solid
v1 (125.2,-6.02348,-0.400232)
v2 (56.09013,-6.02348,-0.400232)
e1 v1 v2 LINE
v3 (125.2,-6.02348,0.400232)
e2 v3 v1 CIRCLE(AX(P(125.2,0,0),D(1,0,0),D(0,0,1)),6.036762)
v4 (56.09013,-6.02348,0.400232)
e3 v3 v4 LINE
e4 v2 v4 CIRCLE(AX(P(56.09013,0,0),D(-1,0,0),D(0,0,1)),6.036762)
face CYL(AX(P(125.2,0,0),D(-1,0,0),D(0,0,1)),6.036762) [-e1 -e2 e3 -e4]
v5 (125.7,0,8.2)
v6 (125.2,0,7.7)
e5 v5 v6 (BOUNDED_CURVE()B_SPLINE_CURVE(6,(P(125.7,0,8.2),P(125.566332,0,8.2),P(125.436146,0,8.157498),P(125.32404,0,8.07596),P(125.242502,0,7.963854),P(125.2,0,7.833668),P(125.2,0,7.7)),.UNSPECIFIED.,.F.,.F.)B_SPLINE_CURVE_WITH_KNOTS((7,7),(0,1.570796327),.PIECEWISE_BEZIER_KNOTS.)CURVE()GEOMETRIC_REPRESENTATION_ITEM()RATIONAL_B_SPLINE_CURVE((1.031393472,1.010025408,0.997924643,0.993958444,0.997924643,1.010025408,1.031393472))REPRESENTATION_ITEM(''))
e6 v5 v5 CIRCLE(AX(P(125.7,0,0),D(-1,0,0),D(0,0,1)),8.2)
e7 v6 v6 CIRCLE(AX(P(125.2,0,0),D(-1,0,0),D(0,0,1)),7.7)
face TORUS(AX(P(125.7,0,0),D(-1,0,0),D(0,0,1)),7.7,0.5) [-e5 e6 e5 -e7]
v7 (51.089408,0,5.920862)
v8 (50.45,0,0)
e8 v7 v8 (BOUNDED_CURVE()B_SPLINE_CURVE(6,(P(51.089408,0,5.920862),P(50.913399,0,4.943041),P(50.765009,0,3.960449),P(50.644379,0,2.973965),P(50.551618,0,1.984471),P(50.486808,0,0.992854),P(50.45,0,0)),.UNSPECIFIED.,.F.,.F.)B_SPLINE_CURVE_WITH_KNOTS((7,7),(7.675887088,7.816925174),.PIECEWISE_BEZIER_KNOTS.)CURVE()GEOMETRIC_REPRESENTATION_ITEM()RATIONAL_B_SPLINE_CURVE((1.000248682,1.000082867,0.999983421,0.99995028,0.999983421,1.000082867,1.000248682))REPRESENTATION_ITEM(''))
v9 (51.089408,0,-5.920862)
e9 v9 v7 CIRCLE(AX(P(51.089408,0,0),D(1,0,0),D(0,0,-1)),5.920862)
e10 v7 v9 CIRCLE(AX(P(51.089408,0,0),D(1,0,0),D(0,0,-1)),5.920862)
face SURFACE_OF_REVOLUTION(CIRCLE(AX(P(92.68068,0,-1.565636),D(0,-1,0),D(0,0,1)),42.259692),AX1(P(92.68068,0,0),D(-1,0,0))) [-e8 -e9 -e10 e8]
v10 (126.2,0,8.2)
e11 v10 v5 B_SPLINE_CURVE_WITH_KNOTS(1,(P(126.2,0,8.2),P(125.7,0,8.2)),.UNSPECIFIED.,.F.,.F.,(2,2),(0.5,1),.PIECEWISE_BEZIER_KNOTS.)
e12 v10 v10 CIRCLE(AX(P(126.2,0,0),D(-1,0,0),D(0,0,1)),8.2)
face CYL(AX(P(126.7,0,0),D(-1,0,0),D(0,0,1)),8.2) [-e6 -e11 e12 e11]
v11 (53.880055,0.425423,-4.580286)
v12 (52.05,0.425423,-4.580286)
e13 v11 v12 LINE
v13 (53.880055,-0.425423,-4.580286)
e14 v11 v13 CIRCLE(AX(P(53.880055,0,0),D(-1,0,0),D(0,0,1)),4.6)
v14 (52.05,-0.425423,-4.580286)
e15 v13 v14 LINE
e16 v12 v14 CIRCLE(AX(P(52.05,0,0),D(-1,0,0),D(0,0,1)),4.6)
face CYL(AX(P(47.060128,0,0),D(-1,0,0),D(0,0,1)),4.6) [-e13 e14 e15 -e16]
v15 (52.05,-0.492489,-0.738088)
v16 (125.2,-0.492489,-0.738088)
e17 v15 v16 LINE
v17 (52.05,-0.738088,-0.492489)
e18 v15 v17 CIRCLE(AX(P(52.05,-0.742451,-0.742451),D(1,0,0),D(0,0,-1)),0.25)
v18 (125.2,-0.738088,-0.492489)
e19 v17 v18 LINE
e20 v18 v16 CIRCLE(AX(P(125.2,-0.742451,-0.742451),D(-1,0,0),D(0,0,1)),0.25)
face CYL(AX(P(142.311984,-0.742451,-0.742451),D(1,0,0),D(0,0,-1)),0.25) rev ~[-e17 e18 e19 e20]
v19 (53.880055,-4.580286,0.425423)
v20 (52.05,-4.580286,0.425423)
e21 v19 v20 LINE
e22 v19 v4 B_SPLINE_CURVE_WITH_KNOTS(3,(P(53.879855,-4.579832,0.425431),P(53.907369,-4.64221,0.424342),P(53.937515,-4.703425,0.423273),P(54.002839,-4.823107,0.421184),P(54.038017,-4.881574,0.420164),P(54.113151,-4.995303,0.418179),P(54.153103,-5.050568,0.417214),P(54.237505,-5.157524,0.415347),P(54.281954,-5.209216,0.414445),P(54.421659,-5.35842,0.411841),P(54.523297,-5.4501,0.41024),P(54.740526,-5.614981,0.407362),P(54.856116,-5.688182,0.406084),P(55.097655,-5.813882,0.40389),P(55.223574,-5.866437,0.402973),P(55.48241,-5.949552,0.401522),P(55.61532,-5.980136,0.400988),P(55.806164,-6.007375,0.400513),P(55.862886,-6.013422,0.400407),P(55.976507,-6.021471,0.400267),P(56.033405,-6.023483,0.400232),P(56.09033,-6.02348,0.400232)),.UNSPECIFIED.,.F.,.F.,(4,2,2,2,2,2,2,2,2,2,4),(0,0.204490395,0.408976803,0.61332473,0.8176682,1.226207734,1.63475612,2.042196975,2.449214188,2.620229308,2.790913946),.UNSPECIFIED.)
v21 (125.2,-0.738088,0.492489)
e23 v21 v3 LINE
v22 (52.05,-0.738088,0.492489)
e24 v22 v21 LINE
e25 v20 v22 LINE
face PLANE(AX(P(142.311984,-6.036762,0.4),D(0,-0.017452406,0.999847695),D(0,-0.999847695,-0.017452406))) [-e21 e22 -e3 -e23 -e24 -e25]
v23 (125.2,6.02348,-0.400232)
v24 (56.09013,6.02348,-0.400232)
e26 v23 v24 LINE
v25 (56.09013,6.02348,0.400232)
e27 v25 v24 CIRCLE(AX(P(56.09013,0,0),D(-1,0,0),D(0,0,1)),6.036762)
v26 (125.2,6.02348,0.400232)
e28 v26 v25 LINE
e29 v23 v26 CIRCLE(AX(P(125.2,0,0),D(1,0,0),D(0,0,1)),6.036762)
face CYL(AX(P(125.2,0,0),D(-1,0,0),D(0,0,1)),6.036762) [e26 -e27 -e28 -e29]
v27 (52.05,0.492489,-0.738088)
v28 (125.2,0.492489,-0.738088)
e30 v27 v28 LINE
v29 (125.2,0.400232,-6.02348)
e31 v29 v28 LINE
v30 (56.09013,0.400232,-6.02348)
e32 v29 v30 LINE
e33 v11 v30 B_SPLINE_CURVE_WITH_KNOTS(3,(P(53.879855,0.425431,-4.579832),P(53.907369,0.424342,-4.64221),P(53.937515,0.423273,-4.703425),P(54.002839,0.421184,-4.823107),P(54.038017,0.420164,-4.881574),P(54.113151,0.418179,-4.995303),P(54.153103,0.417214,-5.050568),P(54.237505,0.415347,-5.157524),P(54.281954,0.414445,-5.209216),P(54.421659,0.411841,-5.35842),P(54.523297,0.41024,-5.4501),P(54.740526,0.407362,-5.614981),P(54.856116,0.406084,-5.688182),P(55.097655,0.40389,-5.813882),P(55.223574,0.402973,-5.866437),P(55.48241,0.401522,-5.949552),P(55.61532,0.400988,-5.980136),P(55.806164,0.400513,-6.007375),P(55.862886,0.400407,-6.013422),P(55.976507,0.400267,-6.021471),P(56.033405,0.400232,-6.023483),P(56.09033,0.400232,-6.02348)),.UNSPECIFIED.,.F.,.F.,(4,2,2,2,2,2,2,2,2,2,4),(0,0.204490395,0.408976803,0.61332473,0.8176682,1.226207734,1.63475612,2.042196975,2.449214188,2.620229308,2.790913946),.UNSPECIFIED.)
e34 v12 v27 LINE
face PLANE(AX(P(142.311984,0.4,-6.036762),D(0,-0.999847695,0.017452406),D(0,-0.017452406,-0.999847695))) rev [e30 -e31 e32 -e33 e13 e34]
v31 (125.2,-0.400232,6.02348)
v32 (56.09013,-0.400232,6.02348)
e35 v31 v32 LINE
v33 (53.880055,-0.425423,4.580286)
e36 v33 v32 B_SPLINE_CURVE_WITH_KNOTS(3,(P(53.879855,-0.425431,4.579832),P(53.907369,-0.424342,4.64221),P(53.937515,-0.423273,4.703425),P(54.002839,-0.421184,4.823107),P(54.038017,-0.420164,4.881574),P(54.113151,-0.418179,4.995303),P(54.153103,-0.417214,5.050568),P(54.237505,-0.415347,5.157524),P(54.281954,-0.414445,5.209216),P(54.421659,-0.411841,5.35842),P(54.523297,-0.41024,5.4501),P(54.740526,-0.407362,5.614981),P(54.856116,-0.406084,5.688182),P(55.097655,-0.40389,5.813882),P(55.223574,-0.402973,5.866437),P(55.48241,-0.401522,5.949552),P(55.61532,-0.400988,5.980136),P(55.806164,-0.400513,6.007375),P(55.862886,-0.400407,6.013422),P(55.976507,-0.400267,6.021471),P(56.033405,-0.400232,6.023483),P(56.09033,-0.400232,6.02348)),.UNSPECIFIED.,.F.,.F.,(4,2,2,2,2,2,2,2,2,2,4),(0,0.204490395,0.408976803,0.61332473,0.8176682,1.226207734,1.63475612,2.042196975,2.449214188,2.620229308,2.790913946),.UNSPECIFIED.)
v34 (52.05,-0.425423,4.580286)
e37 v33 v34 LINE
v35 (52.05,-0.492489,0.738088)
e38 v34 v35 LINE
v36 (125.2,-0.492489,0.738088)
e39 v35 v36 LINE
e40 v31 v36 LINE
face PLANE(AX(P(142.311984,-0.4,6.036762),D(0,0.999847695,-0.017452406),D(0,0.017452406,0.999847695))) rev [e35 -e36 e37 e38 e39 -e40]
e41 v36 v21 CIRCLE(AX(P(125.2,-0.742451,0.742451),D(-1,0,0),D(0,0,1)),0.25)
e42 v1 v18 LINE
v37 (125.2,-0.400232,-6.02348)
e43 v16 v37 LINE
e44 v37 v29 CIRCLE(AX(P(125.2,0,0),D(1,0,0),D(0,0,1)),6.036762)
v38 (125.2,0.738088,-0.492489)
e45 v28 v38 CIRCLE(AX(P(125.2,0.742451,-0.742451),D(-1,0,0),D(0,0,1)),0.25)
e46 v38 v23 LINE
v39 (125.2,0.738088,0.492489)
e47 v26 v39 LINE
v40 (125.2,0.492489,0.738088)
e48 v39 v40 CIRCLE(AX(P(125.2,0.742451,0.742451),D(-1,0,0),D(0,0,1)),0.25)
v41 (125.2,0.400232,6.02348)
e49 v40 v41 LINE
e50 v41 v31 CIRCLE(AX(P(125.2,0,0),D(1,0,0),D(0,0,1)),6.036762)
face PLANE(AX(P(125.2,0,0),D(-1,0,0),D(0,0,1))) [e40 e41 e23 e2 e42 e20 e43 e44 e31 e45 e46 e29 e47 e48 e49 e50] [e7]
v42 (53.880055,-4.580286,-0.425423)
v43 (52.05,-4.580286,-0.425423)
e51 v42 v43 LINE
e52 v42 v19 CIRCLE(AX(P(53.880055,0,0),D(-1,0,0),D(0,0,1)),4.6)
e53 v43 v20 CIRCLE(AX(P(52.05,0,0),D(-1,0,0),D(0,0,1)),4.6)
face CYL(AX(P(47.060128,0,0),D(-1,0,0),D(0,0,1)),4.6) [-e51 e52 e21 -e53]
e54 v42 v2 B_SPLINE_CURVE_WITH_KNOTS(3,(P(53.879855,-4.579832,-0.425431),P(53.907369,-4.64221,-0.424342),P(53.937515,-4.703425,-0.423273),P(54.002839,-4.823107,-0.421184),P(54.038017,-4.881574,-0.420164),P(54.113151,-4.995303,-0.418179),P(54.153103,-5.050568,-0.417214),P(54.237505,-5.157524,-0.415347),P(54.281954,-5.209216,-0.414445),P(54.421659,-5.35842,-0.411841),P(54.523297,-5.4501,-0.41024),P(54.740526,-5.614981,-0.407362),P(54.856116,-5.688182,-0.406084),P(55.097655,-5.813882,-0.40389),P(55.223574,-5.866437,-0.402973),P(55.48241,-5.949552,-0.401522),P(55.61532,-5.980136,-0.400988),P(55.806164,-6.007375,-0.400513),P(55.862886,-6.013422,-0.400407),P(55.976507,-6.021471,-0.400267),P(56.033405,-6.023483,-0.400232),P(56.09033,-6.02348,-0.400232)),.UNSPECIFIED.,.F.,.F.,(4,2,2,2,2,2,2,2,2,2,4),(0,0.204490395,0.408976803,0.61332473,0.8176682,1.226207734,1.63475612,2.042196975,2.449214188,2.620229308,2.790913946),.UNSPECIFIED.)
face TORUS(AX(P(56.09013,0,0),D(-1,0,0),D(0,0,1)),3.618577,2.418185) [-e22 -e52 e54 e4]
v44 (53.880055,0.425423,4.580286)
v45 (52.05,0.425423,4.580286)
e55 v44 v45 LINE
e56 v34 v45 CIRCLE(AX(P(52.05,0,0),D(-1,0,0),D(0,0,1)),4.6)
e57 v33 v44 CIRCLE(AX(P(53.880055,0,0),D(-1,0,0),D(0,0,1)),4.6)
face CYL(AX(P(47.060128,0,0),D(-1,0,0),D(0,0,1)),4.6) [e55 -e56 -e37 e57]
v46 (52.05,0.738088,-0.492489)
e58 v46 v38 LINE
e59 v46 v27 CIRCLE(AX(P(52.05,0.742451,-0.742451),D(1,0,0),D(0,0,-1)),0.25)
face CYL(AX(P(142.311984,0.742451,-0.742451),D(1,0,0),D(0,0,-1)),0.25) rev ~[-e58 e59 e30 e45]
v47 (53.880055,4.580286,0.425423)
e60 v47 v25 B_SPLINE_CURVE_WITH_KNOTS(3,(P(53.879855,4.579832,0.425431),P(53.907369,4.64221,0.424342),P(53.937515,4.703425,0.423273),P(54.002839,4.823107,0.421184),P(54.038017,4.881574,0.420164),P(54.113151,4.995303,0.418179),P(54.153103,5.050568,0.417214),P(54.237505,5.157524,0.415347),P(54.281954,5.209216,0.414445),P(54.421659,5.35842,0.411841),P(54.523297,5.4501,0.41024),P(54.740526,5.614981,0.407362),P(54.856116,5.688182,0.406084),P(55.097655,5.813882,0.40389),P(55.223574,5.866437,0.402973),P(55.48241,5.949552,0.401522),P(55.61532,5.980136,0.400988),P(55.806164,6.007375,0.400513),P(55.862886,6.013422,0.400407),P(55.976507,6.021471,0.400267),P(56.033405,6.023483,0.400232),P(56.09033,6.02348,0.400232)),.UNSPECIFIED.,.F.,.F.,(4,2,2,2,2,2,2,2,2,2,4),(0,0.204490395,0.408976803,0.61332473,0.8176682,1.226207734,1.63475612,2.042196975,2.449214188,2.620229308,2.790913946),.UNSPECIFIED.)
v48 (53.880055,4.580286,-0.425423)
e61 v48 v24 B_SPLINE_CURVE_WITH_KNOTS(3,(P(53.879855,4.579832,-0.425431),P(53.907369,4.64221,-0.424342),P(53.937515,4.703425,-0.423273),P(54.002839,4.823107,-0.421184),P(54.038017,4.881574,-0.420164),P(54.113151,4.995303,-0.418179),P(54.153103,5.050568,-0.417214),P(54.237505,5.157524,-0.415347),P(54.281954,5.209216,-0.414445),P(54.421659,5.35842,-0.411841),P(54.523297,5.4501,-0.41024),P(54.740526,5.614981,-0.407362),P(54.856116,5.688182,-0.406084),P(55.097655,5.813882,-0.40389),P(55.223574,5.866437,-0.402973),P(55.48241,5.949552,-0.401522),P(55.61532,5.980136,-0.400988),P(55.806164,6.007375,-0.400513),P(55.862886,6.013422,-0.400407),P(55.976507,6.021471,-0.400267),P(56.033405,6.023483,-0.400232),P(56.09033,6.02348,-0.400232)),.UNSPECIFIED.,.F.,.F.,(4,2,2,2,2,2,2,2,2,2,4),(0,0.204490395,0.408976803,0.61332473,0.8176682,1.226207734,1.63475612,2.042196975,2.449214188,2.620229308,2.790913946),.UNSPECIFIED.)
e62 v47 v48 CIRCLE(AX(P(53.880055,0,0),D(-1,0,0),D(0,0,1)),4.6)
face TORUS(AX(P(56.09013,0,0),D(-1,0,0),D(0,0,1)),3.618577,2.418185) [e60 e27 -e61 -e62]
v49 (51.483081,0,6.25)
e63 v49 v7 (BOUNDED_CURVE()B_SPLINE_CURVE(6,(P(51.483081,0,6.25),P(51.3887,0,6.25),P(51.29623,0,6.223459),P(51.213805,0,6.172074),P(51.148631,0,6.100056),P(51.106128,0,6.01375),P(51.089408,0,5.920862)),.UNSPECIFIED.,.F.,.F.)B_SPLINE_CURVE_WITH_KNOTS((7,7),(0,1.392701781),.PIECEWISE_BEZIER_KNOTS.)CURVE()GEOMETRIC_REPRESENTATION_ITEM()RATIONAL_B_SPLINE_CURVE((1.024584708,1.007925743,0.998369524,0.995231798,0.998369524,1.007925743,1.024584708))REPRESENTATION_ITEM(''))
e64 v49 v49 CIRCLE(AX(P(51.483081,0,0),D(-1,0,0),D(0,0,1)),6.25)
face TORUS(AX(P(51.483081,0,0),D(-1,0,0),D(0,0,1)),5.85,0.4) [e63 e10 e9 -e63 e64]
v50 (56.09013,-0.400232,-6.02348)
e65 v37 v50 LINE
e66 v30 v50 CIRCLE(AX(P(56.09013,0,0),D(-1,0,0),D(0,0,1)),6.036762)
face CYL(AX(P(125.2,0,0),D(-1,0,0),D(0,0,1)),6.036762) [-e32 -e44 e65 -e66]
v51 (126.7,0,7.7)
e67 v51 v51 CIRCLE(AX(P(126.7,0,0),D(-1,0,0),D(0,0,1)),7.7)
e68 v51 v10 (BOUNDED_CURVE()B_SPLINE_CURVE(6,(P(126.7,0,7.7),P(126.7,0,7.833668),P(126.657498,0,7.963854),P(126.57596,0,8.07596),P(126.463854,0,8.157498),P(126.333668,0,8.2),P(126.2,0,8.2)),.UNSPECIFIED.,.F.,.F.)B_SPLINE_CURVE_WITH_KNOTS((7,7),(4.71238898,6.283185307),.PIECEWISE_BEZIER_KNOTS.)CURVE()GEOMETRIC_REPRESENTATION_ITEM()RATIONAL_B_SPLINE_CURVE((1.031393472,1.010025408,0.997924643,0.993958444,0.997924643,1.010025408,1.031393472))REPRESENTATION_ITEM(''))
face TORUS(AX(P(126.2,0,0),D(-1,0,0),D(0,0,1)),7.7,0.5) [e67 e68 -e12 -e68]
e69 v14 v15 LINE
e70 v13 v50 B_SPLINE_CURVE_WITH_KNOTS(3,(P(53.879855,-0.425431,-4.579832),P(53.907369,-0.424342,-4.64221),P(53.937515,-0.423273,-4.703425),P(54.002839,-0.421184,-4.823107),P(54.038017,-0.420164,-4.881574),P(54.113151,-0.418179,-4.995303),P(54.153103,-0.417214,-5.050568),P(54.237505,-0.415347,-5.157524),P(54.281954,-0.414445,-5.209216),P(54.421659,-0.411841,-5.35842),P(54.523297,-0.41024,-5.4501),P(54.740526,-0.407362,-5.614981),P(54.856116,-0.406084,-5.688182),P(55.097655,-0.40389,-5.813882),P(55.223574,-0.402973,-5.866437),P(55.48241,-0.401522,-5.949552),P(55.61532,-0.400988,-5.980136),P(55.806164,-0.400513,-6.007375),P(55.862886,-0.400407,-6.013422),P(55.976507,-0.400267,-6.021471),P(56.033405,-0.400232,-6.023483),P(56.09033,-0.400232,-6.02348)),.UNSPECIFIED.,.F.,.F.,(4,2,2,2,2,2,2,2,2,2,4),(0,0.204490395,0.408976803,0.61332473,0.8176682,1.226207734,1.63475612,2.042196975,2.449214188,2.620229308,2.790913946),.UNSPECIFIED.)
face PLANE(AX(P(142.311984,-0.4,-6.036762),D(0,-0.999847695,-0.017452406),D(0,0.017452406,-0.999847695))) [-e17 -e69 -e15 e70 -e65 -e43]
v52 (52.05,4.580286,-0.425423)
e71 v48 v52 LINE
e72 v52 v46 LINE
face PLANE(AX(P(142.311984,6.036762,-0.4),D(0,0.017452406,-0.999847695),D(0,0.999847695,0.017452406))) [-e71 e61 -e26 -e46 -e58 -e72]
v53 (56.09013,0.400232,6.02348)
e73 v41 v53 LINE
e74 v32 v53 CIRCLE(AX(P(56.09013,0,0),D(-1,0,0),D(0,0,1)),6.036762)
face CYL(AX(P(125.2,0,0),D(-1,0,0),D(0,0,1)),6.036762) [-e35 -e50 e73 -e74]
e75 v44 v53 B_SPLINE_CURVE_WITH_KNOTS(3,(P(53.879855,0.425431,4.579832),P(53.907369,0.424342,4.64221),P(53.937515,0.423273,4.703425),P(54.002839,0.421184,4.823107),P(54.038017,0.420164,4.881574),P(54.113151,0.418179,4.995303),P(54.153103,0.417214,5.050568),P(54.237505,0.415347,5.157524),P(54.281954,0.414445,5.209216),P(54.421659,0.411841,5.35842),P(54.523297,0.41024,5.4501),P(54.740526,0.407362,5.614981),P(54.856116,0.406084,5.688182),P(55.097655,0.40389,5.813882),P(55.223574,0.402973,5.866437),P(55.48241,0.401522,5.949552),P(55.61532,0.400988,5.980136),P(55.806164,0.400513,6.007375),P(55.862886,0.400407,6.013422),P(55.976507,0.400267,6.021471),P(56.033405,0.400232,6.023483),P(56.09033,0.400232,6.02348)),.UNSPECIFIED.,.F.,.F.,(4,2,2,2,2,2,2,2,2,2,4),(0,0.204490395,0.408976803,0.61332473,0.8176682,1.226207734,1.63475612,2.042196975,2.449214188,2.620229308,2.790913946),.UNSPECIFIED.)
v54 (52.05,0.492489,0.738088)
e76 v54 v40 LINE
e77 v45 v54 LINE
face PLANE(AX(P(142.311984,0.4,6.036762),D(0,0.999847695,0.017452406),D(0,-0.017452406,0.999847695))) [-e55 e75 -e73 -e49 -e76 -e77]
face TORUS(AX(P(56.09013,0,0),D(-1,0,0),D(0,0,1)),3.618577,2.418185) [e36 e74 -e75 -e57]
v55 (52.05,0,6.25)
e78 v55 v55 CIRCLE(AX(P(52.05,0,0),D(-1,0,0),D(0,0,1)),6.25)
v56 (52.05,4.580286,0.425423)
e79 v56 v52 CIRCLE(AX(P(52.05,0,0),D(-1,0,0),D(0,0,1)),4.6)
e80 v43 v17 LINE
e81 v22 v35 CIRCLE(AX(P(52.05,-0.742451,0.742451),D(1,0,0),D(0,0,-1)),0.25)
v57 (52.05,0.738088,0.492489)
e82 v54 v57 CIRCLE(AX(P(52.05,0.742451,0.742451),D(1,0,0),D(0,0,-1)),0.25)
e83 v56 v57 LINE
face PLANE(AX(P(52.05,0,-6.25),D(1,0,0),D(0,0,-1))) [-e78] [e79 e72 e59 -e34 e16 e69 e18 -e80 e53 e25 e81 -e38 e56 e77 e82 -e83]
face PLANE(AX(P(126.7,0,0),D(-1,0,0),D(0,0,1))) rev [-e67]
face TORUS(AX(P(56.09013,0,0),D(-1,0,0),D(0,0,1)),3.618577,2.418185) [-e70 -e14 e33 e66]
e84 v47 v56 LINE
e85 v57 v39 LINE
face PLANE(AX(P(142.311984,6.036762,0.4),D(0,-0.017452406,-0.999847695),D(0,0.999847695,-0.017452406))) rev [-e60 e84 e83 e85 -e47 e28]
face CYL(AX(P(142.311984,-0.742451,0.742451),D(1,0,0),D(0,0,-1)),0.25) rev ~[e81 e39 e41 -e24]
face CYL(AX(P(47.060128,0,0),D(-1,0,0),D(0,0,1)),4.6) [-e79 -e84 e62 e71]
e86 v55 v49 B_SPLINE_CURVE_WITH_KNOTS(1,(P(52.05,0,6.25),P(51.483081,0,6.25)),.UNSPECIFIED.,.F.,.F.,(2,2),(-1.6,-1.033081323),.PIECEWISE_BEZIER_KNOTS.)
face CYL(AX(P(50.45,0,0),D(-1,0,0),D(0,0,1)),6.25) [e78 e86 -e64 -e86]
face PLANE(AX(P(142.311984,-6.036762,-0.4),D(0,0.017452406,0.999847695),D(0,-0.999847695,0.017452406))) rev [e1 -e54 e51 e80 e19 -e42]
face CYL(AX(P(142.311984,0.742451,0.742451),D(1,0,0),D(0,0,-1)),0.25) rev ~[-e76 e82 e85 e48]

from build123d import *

# Parameters (mm, degrees)
BOSS_EXTRUDE4_START   = 53.880055185
BOSS_EXTRUDE4_2_DEPTH = 71.319944815
BOSS_EXTRUDE4_START_2 = 52.05
BOSS_EXTRUDE4_3_DEPTH = 4.040129852
SKETCH26_R            = 8.2
BOSS_EXTRUDE5_DEPTH   = 1.5
FILLET8_R             = 0.25
FILLET9_R             = 0.4
FILLET10_R            = 0.5


with BuildPart() as part:
    # Boss-Extrude4: read off the stored shape, not the designer's step
    # Boss-Extrude4 outline → Boss-Extrude4 (revolve)
    with BuildSketch(Plane.YX):
        with BuildLine():
            Line((0, 52.05), (0, 50.45))
            add(Edge.make_bspline(
                [(6.25, 51.15), (3.15111586, 50.566822676), (0, 50.45)],
                knots=[1.384782418, 1.384782418, 1.384782418, 1.533739867, 1.533739867, 1.533739867], degree=2, weights=[1, 0.997227742, 1]))
            Line((6.25, 51.15), (6.25, 52.05))
            Line((6.25, 52.05), (0, 52.05))
        make_face()
    revolve(axis=Axis((0, 0, 0), (1, 0, 0)))



with BuildPart() as body_2:
    # Boss-Extrude4 2 outline → Boss-Extrude4 2 (new body)
    with BuildSketch(Plane.YZ.offset(BOSS_EXTRUDE4_START)):
        with BuildLine():
            Line((-0.496702112, -0.496702112), (-0.40023184, -6.023480263))
            ThreePointArc((-0.40023184, -6.023480263), (0, -6.036762377), (0.40023184, -6.023480263))
            Line((0.40023184, -6.023480263), (0.496702112, -0.496702112))
            Line((0.496702112, -0.496702112), (6.023480263, -0.40023184))
            ThreePointArc((6.023480263, -0.40023184), (6.036762377, 0), (6.023480263, 0.40023184))
            Line((6.023480263, 0.40023184), (0.496702112, 0.496702112))
            Line((0.496702112, 0.496702112), (0.40023184, 6.023480263))
            ThreePointArc((0.40023184, 6.023480263), (0, 6.036762377), (-0.40023184, 6.023480263))
            Line((-0.40023184, 6.023480263), (-0.496702112, 0.496702112))
            Line((-0.496702112, 0.496702112), (-6.023480263, 0.40023184))
            ThreePointArc((-6.023480263, 0.40023184), (-6.036762377, 0), (-6.023480263, -0.40023184))
            Line((-6.023480263, -0.40023184), (-0.496702112, -0.496702112))
        make_face()
    extrude(amount=BOSS_EXTRUDE4_2_DEPTH)


with BuildPart() as part_1:
    add(part.part)

    add(body_2.part)  # Boss-Extrude4 3 merges body 2
    # Boss-Extrude4 3 outline → Boss-Extrude4 3 (add)
    with BuildSketch(Plane.YZ.offset(BOSS_EXTRUDE4_START_2)):
        with BuildLine():
            Line((-4.58028551, -0.425422898), (-0.496702112, -0.496702112))
            Line((-0.496702112, -0.496702112), (-0.425422898, -4.58028551))
            ThreePointArc((-0.425422898, -4.58028551), (0, -4.6), (0.425422898, -4.58028551))
            Line((0.425422898, -4.58028551), (0.496702112, -0.496702112))
            Line((0.496702112, -0.496702112), (4.58028551, -0.425422898))
            ThreePointArc((4.58028551, -0.425422898), (4.6, 0), (4.58028551, 0.425422898))
            Line((4.58028551, 0.425422898), (0.496702112, 0.496702112))
            Line((0.496702112, 0.496702112), (0.425422898, 4.58028551))
            ThreePointArc((0.425422898, 4.58028551), (0, 4.6), (-0.425422898, 4.58028551))
            Line((-0.425422898, 4.58028551), (-0.496702112, 0.496702112))
            Line((-0.496702112, 0.496702112), (-4.58028551, 0.425422898))
            ThreePointArc((-4.58028551, 0.425422898), (-4.6, 0), (-4.58028551, -0.425422898))
        make_face()
    extrude(amount=BOSS_EXTRUDE4_3_DEPTH)

    # Boss-Extrude4 4 outline → Boss-Extrude4 4 (revolve, cut)
    with BuildSketch(Plane.YX):
        with BuildLine():
            Line((6.036762378, 53.880055185), (6.036762377, 56.090129852))
            ThreePointArc((6.036762377, 56.090129852), (5.645999412, 54.772109014), (4.6, 53.880055286))
            Line((4.6, 53.880055286), (6.036762378, 53.880055185))
        make_face()
    revolve(axis=Axis((0, 0, 0), (1, 0, 0)), mode=Mode.SUBTRACT)

    # Sketch26 → Boss-Extrude5 (add)
    with BuildSketch(Plane.ZY.offset(-125.2)):
        Circle(SKETCH26_R)
    extrude(amount=-BOSS_EXTRUDE5_DEPTH)

    # Fillet8
    fillet8_edges = [part_1.edges().sort_by_distance(p)[0] for p in [
        (89.540027592, 0.496702112, -0.496702112),
        (89.540027592, -0.496702112, -0.496702112),
        (89.540027592, -0.496702112, 0.496702112),
        (89.540027592, 0.496702112, 0.496702112),
    ]]
    fillet(fillet8_edges, radius=FILLET8_R)

    # Fillet9
    fillet9_edges = [part_1.edges().sort_by_distance(p)[0] for p in [
        (51.15, -6.25, 0),
    ]]
    fillet(fillet9_edges, radius=FILLET9_R)

    # Fillet10
    fillet10_edges = [part_1.edges().sort_by_distance(p)[0] for p in [
        (126.7, 0, -8.2),
        (125.2, 0, -8.2),
    ]]
    fillet(fillet10_edges, radius=FILLET10_R)


solid = part_1.part
